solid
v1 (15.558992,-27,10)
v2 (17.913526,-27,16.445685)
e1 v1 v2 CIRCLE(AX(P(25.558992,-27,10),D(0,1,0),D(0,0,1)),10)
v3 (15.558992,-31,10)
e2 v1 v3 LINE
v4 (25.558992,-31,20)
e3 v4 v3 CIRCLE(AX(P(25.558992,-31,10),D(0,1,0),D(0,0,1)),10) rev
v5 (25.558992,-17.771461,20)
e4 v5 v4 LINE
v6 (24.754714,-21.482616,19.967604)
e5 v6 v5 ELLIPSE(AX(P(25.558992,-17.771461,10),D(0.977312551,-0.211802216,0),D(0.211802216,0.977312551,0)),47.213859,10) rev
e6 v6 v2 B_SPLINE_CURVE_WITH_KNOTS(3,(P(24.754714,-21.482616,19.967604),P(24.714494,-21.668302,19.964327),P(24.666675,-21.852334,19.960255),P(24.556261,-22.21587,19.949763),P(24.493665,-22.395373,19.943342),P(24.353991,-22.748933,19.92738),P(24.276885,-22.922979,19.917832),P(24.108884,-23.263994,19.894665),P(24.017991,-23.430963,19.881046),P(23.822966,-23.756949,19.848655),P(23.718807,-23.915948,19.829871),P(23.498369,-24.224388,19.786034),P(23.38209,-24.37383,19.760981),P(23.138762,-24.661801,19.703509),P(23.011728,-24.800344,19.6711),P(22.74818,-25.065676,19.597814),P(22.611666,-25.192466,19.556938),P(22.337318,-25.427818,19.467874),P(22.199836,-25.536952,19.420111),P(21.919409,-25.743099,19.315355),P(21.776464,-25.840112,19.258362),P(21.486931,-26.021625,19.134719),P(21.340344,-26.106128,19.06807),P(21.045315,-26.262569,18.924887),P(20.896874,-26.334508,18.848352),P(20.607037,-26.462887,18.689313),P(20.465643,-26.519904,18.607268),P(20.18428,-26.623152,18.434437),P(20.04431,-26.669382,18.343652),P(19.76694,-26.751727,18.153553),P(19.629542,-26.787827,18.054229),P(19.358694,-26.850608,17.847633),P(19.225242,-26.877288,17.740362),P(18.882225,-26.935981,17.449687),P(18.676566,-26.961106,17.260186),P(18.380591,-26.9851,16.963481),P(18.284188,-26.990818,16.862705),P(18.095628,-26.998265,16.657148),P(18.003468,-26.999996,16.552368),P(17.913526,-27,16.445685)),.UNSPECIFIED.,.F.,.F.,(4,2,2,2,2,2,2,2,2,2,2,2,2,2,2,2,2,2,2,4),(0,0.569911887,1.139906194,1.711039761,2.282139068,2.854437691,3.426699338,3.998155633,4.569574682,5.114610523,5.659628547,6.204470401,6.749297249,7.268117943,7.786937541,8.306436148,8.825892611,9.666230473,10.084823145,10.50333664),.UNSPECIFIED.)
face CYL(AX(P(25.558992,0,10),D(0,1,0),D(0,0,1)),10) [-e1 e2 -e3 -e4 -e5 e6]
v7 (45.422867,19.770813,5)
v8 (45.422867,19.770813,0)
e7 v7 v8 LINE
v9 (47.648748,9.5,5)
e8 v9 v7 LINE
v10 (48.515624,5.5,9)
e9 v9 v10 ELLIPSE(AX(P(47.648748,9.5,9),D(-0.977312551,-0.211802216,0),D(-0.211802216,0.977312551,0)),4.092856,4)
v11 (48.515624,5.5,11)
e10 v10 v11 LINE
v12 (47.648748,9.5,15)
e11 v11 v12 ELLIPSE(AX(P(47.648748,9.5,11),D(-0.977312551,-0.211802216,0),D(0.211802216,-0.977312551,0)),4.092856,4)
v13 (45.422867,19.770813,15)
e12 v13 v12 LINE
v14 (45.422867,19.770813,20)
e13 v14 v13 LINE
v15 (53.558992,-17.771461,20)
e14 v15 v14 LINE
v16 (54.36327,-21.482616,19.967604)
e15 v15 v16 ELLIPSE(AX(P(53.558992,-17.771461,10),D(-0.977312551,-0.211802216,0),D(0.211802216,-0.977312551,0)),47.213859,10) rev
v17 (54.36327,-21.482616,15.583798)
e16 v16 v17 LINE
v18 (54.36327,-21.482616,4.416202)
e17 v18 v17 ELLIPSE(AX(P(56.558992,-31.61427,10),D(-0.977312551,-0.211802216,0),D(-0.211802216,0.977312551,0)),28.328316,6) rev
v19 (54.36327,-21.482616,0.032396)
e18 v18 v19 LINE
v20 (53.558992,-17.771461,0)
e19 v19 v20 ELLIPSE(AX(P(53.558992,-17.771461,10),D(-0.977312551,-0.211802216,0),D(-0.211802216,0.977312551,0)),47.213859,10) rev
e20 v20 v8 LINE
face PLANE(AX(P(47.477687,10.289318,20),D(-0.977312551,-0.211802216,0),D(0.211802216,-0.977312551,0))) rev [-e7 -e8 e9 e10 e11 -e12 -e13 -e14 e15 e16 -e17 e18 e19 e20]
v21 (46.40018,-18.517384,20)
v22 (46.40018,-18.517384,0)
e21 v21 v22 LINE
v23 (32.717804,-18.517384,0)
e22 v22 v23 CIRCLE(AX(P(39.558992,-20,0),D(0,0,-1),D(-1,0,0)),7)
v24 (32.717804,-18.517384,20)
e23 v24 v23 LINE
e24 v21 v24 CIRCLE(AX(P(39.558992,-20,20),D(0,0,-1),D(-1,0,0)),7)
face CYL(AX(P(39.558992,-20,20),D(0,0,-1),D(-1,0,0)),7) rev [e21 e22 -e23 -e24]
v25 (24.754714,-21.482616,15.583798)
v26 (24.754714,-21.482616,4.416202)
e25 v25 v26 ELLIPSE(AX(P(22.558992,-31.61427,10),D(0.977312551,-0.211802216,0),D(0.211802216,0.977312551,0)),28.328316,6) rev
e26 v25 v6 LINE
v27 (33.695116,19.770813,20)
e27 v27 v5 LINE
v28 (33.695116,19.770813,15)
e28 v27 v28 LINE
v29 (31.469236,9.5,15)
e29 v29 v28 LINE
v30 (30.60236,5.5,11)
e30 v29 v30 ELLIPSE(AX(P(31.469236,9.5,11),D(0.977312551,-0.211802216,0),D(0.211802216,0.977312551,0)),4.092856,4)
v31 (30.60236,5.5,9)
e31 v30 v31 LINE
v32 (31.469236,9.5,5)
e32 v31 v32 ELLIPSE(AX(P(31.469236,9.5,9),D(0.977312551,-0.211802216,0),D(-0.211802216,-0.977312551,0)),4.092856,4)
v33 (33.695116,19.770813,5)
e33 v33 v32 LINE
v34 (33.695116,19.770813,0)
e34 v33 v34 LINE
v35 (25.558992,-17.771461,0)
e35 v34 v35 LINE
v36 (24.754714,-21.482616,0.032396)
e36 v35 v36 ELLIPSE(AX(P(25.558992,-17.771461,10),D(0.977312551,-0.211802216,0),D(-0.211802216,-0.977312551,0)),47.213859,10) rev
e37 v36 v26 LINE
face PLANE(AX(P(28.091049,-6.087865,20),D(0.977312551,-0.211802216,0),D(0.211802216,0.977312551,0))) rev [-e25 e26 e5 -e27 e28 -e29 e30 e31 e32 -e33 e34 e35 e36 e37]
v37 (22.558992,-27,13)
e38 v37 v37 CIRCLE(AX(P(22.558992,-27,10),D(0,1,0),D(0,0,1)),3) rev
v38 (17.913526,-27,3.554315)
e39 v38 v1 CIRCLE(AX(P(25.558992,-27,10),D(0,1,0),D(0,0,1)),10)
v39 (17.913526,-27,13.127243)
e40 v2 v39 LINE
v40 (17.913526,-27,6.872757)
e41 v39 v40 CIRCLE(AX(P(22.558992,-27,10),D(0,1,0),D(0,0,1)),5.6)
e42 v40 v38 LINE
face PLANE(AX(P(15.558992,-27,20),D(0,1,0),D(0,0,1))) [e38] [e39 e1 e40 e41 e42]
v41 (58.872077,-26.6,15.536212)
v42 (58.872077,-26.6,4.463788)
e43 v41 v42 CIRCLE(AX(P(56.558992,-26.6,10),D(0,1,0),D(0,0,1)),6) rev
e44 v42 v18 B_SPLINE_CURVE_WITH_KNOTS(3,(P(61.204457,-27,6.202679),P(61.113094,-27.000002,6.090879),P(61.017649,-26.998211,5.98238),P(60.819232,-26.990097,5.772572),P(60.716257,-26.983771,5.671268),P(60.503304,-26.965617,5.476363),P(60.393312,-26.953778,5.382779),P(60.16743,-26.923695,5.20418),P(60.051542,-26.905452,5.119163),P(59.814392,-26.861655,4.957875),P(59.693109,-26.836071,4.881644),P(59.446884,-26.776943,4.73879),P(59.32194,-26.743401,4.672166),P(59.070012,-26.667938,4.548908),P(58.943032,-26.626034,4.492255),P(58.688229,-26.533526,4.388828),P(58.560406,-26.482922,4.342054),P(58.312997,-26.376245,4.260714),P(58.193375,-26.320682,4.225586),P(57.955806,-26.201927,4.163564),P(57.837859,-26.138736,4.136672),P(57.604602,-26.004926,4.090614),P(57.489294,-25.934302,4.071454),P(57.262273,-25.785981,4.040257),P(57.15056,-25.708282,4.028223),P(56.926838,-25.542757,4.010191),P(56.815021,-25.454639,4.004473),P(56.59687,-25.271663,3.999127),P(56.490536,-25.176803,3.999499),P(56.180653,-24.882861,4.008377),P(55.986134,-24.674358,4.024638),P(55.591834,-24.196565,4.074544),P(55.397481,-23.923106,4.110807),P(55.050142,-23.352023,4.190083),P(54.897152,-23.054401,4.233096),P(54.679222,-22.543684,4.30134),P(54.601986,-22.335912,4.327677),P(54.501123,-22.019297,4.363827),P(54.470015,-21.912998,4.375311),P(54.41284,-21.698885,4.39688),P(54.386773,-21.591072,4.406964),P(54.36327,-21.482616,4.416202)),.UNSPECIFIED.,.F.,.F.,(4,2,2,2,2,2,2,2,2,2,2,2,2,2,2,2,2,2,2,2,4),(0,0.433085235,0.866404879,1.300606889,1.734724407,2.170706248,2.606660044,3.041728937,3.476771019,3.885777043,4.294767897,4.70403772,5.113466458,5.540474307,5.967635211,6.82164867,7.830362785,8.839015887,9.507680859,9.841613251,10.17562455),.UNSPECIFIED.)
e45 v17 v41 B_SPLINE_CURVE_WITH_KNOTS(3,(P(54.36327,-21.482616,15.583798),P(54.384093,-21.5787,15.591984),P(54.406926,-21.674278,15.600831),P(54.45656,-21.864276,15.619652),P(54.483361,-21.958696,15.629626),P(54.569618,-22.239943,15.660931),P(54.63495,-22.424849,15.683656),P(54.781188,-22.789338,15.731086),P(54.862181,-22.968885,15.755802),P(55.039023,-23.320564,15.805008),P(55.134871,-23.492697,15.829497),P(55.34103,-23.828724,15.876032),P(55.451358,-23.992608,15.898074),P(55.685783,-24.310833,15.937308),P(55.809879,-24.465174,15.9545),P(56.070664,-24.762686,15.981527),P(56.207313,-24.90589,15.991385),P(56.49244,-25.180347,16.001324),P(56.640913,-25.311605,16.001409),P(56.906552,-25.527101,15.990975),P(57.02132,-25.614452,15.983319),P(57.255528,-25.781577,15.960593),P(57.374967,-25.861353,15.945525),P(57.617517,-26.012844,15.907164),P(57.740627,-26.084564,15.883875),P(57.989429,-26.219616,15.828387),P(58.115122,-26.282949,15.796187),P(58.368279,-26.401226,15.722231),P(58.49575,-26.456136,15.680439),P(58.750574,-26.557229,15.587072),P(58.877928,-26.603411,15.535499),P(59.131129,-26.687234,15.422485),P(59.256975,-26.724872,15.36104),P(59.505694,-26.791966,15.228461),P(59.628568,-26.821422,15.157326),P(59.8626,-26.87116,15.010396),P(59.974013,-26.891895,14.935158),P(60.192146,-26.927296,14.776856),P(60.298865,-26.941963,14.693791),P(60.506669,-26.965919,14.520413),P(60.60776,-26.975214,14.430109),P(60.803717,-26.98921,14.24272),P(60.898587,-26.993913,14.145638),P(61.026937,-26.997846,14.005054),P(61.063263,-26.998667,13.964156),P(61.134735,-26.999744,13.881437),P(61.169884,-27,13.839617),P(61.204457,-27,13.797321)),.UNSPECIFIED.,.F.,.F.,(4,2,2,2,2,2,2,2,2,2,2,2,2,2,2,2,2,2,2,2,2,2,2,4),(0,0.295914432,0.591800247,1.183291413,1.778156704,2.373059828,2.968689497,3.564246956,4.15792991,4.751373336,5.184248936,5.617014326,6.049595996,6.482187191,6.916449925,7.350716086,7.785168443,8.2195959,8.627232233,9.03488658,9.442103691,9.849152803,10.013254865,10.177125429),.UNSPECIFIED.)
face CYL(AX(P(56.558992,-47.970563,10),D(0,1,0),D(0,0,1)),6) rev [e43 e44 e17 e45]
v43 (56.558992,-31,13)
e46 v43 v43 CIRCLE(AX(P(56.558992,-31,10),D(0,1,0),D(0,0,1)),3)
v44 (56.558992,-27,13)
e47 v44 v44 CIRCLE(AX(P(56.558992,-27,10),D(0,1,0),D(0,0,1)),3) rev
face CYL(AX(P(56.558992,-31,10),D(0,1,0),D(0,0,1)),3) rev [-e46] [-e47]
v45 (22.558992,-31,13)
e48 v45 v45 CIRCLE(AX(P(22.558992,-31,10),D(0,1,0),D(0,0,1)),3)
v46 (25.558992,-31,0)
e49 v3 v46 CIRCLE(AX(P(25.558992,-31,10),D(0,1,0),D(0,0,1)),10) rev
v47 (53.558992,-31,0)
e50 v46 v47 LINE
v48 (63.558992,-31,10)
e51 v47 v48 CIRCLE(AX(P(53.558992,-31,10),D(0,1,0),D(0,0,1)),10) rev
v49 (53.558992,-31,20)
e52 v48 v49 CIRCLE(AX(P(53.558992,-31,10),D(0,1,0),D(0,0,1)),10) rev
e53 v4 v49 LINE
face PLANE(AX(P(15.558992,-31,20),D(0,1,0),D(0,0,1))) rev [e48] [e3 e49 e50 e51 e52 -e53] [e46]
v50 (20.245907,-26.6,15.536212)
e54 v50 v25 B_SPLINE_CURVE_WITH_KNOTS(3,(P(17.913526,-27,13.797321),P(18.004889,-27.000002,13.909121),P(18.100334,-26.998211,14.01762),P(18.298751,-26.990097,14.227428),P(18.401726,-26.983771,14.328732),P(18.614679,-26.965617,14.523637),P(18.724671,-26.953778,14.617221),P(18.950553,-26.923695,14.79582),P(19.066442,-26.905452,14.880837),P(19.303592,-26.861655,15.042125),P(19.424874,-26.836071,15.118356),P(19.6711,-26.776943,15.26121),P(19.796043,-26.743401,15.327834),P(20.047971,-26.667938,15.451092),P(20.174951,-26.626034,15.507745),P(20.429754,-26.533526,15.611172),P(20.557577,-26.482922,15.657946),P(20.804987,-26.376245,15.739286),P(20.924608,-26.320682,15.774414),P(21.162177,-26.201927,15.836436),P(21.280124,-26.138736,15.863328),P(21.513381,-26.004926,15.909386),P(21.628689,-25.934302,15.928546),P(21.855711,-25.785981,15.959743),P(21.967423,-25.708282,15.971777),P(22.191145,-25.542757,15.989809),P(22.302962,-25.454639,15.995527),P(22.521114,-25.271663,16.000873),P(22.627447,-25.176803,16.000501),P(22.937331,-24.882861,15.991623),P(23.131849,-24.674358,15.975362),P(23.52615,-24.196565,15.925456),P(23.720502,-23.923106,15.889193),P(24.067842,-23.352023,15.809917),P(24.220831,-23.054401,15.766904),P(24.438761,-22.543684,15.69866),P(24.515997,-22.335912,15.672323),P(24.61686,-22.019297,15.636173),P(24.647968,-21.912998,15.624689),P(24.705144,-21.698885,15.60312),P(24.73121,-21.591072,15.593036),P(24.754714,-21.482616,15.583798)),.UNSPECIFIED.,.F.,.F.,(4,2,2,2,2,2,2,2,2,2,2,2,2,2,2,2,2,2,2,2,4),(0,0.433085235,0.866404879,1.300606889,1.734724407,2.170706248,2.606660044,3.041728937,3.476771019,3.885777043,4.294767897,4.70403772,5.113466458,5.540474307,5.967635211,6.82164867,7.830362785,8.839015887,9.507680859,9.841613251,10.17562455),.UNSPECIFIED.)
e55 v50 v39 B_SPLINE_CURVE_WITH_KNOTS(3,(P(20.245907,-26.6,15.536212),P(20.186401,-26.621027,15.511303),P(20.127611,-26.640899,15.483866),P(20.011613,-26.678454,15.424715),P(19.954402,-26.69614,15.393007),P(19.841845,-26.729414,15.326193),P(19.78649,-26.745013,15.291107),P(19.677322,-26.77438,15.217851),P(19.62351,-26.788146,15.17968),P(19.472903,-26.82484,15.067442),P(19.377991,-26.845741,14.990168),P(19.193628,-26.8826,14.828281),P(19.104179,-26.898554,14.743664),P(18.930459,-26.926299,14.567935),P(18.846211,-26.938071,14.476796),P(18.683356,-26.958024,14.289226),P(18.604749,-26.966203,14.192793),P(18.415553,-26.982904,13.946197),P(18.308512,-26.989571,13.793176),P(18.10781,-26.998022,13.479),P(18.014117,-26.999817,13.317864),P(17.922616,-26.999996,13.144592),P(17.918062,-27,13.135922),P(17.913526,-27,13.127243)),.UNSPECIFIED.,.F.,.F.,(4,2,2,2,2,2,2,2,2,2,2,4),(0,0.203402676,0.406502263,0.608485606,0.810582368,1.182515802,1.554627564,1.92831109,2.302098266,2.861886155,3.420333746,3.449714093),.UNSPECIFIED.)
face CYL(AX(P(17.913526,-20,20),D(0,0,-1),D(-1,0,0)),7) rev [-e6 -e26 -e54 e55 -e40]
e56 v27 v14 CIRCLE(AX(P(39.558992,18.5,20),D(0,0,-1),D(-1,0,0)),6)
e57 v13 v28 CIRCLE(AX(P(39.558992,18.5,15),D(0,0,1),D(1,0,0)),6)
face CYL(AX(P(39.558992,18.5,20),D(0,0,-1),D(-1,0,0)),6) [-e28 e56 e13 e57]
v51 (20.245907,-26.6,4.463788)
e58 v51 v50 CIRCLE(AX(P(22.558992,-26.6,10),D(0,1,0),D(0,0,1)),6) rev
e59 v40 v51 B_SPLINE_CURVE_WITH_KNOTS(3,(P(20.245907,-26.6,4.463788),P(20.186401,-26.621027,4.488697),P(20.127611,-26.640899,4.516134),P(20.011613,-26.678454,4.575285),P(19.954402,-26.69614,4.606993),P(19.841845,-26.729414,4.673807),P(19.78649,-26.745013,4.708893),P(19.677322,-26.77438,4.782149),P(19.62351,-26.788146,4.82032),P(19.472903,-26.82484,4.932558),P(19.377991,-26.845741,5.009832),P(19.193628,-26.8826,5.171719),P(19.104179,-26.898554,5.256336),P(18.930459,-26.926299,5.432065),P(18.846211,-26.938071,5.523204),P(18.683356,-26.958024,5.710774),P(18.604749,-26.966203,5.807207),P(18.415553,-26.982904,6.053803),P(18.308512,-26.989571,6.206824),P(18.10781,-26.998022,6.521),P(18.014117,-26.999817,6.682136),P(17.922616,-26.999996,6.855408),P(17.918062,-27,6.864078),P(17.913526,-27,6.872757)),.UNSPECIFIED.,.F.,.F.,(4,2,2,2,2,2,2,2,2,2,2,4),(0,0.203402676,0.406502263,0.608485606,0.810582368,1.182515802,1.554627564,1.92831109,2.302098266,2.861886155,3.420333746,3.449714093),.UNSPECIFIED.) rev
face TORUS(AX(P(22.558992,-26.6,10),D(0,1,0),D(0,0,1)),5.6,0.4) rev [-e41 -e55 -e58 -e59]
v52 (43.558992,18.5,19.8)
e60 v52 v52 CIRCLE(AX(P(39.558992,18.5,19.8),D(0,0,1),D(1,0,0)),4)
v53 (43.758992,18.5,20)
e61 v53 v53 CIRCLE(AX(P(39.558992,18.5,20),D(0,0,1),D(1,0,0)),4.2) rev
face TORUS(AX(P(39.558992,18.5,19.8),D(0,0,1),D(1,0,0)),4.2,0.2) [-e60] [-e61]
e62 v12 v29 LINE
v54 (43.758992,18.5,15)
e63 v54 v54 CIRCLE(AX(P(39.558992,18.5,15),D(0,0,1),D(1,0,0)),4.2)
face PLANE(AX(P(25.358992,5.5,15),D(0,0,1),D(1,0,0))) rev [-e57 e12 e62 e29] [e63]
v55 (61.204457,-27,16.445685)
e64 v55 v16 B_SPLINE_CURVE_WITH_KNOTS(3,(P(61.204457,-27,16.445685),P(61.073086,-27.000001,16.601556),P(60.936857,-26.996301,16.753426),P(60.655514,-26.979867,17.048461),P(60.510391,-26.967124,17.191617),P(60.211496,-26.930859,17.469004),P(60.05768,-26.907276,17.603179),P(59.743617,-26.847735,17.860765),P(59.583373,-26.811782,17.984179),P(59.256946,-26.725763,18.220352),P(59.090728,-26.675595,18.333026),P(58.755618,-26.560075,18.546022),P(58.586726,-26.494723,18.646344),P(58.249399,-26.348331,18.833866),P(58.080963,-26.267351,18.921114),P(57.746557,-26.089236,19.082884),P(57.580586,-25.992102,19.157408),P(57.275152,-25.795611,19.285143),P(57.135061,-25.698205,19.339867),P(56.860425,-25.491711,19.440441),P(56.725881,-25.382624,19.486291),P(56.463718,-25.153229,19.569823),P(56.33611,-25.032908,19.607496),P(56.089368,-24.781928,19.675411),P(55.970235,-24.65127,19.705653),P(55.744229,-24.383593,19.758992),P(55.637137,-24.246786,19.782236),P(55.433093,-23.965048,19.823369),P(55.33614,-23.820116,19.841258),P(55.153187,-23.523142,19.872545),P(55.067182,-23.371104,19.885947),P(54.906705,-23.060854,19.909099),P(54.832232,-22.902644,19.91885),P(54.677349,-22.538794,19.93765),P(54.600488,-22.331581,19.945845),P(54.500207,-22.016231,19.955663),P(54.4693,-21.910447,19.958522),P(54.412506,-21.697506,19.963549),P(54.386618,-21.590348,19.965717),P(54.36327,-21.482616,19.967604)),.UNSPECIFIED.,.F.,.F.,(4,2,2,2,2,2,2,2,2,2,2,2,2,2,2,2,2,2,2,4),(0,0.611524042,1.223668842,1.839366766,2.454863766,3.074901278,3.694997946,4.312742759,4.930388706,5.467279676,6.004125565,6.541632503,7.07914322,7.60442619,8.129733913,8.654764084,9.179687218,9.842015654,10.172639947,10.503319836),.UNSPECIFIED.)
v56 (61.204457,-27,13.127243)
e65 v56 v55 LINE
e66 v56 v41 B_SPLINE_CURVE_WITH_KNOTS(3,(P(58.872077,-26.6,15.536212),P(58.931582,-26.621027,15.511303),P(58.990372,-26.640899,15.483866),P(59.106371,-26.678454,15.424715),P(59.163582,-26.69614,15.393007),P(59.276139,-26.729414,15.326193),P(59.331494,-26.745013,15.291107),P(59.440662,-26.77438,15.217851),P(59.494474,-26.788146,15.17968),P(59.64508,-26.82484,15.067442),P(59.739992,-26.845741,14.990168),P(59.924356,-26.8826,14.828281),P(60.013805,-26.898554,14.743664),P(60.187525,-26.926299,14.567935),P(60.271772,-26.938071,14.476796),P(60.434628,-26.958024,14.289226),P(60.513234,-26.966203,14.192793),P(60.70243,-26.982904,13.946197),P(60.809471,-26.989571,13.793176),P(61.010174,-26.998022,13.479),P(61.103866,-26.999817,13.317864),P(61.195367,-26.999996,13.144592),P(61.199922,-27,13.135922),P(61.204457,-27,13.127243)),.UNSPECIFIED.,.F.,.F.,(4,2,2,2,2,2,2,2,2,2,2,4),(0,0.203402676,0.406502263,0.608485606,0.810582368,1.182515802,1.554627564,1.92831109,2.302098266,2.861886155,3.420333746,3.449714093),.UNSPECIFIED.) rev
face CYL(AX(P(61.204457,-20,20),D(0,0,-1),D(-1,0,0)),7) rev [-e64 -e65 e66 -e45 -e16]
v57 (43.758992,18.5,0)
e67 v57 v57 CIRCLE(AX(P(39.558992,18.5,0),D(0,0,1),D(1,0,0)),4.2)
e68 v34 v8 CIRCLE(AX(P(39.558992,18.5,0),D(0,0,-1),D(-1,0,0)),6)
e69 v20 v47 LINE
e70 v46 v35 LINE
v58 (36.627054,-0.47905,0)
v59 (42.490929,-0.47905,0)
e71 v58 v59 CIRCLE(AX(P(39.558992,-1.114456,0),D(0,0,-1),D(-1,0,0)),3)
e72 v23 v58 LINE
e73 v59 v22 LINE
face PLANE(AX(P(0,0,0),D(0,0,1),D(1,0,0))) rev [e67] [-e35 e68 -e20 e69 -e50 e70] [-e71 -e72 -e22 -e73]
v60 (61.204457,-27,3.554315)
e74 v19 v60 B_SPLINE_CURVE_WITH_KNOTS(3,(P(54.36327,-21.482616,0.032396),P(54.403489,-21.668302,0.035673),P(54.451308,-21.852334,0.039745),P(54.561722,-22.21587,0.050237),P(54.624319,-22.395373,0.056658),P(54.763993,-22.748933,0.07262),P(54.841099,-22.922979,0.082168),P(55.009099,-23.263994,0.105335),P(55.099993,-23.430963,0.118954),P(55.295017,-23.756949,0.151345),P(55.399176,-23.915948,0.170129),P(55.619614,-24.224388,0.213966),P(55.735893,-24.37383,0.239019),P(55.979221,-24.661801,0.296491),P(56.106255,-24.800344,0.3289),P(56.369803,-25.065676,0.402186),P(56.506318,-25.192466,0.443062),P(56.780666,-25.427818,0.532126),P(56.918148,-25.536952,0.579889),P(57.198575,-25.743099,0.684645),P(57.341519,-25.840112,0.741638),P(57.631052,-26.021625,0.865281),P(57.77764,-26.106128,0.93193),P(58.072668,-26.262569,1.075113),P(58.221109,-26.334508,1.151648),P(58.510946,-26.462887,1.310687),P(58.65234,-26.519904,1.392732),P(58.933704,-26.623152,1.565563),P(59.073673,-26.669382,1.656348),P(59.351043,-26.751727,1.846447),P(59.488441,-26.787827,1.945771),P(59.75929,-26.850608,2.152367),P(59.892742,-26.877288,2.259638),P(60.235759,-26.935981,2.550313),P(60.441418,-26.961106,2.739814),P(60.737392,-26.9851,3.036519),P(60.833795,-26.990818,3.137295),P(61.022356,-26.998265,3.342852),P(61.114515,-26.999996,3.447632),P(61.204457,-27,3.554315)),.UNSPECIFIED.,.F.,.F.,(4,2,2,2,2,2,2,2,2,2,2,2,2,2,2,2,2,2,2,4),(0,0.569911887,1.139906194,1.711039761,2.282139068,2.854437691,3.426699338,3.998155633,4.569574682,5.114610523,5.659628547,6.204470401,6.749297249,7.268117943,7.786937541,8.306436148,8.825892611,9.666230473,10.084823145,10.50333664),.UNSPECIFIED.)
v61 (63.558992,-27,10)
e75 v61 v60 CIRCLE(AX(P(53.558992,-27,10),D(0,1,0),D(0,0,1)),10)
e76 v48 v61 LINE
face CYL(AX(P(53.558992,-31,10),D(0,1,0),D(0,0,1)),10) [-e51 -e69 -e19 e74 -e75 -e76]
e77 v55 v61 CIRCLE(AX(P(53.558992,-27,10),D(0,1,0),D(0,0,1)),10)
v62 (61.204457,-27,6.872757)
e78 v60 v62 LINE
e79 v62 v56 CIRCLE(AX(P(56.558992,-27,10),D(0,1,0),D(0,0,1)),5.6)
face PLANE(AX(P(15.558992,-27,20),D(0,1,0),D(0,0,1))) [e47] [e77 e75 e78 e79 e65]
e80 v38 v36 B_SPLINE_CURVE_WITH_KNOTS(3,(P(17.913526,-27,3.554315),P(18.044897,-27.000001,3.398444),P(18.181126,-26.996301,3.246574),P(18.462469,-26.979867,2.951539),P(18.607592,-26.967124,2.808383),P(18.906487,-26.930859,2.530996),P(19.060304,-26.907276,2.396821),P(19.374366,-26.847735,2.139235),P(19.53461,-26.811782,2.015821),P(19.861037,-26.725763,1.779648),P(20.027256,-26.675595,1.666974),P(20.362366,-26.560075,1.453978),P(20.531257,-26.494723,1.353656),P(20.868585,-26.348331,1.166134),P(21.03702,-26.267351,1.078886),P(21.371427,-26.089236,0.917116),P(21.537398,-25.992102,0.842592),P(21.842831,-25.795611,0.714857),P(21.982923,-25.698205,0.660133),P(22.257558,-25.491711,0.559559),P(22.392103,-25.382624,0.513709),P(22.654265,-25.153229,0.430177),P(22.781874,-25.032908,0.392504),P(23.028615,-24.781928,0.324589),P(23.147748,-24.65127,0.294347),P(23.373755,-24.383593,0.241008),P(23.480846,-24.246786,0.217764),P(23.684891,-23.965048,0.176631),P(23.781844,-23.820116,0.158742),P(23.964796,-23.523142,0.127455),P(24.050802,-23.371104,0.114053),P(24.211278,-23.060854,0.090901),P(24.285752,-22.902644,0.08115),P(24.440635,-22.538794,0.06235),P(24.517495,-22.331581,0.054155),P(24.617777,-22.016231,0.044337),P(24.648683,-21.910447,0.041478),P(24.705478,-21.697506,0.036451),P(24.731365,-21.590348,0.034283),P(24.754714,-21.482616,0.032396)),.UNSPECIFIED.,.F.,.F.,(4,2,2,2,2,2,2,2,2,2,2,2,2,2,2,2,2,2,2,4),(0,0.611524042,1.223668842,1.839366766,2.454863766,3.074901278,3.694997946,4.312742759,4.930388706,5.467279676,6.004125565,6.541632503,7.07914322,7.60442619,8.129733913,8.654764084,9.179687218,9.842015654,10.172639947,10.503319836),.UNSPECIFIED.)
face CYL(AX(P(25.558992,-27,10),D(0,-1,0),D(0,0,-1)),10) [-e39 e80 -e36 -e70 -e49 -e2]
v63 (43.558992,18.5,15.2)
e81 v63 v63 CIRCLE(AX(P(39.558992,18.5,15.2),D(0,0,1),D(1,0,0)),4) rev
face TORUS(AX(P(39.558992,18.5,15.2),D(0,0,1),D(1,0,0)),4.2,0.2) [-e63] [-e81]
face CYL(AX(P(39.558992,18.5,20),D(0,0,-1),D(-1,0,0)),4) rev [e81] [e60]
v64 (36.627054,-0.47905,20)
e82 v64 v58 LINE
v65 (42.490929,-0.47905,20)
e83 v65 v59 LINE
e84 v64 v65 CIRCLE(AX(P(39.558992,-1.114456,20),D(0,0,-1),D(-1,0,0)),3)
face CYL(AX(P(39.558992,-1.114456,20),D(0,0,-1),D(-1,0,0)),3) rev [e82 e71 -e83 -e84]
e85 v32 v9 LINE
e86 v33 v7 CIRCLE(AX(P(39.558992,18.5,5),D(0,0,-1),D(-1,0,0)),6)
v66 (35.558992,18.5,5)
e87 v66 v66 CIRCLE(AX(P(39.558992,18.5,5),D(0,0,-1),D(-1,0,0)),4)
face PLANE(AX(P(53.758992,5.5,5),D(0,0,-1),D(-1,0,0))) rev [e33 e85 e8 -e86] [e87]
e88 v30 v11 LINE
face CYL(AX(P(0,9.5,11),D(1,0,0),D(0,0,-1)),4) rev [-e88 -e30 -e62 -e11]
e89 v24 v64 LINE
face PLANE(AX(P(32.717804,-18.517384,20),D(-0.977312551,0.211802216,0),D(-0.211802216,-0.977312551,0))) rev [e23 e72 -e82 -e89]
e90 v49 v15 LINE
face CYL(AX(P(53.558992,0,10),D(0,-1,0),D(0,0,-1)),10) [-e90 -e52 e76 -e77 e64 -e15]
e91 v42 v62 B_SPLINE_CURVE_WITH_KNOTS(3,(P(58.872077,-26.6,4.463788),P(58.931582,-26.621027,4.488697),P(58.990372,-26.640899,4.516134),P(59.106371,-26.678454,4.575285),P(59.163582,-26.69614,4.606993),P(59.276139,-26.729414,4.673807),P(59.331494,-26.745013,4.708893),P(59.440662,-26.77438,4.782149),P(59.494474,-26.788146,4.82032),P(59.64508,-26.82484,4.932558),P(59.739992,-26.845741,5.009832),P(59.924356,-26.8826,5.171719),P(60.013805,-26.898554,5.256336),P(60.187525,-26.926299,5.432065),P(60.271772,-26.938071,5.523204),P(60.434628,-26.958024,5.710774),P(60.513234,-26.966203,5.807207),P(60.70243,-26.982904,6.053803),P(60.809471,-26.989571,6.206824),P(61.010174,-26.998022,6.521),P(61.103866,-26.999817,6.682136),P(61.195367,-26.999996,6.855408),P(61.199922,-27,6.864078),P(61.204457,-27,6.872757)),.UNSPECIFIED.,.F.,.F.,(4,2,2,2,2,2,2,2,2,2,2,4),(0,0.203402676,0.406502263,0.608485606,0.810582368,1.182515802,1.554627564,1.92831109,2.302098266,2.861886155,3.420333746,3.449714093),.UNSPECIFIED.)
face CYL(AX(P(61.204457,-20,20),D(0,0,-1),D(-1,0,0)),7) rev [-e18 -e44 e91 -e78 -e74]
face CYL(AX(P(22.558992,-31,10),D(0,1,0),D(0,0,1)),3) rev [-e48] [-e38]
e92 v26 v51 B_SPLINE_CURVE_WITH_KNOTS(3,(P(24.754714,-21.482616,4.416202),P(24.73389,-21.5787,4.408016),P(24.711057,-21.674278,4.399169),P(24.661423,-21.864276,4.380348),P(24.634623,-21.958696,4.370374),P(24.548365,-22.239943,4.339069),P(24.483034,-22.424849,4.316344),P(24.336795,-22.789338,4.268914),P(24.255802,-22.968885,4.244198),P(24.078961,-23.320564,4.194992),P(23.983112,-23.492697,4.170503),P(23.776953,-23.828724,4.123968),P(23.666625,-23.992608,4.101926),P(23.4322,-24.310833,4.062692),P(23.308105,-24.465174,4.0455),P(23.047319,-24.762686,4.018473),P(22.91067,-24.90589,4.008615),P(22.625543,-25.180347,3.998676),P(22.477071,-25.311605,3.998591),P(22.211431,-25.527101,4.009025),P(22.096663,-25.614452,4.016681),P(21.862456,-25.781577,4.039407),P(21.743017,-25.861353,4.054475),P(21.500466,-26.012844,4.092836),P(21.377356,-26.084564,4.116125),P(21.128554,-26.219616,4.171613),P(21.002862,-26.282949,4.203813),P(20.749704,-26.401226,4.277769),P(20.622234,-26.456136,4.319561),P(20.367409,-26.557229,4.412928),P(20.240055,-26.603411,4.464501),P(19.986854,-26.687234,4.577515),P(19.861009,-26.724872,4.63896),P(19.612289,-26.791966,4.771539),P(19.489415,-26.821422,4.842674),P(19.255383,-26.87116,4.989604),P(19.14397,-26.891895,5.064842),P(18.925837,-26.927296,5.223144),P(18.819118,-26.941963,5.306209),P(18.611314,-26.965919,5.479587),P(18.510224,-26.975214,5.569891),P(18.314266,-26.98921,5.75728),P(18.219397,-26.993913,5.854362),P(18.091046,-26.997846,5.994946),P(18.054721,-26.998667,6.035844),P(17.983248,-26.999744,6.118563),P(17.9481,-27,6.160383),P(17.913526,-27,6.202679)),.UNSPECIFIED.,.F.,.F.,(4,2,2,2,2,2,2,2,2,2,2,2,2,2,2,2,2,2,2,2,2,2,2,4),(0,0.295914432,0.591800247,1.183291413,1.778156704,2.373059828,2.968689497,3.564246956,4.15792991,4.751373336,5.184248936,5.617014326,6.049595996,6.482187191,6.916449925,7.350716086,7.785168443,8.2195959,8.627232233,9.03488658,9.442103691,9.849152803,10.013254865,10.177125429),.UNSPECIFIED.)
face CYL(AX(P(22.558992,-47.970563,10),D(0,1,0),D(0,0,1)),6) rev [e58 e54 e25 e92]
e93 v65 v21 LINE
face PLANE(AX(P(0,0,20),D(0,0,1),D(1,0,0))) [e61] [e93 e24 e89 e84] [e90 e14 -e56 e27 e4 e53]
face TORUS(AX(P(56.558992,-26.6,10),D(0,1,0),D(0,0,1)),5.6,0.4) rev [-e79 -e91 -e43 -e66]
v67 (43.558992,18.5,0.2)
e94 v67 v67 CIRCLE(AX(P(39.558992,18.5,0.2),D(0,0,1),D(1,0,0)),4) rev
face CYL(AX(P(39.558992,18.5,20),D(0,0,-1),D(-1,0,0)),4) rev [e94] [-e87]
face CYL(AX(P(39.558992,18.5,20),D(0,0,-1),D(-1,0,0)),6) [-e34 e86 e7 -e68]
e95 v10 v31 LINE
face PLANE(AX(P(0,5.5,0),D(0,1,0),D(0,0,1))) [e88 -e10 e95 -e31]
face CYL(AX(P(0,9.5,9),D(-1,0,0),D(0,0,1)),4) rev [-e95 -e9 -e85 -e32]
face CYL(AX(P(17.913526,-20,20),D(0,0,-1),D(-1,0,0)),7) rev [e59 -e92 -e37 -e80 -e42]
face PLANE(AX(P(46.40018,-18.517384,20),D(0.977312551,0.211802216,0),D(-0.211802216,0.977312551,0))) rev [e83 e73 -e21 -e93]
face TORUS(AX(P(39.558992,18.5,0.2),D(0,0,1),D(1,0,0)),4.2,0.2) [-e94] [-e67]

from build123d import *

# Parameters (mm, degrees)
SZKIC1_R                    = 4
DODANIE_WYCI_GNI_CIE1_DEPTH = 20
SZKIC2_W                    = 28.4
SZKIC2_H                    = 10
WYTNIJ_WYCI_GNI_CIE1_DEPTH  = 22
SZKIC3_R                    = 3
WYTNIJ_WYCI_GNI_CIE2_DEPTH  = 89.667893976
SZKIC4_R                    = 6
WYTNIJ_WYCI_GNI_CIE3_DEPTH  = 54.5
WYTNIJ_WYCI_GNI_CIE5_DEPTH  = 74.489764063
ZAOKR_GLENIE1_R             = 10
WYTNIJ_WYCI_GNI_CIE6_DEPTH  = 74.489764063
ZAOKR_GLENIE2_R             = 7
ZAOKR_GLENIE3_R             = 4
ZAOKR_GLENIE4_R             = 0.4
ZAOKR_GLENIE5_R             = 0.2


with BuildPart() as part:
    # Szkic1 → Dodanie-wyciągnięcie1 (new body)
    with BuildSketch(Plane.XY):
        Polygon((15.55899167, -31), (63.55899167, -31), (63.55899167, -27), (48.75899167, 4.5), (48.75899167, 27.5), (30.35899167, 27.5), (30.35899167, 4.5), (15.55899167, -27), align=None)
        with Locations((39.55899167, 18.5)):
            Circle(SZKIC1_R, mode=Mode.SUBTRACT)
    extrude(amount=DODANIE_WYCI_GNI_CIE1_DEPTH)

    # Szkic2 → Wytnij-wyciągnięcie1 (cut)
    with BuildSketch(Plane(origin=(0, 27.5, 0), x_dir=(1, 0, 0), z_dir=(0, 1, 0))):
        with Locations((39.55899167, -10)):
            Rectangle(SZKIC2_W, SZKIC2_H)
    extrude(amount=-WYTNIJ_WYCI_GNI_CIE1_DEPTH, mode=Mode.SUBTRACT)

    # Szkic3 → Wytnij-wyciągnięcie2 (cut, through all)
    with BuildSketch(Plane(origin=(0, 27.5, 0), x_dir=(1, 0, 0), z_dir=(0, 1, 0))):
        with Locations(Location((56.55899167, -10, 0), (0, 0, 270))):
            Circle(SZKIC3_R)
        with Locations(Location((22.55899167, -10, 0), (0, 0, 270))):
            Circle(SZKIC3_R)
    extrude(amount=-WYTNIJ_WYCI_GNI_CIE2_DEPTH, mode=Mode.SUBTRACT)

    # Szkic4 → Wytnij-wyciągnięcie3 (cut)
    with BuildSketch(Plane(origin=(0, 27.5, 0), x_dir=(1, 0, 0), z_dir=(0, 1, 0))):
        with Locations(Location((56.55899167, -10, 0), (0, 0, 270))):
            Circle(SZKIC4_R)
        with Locations(Location((22.55899167, -10, 0), (0, 0, 270))):
            Circle(SZKIC4_R)
    extrude(amount=-WYTNIJ_WYCI_GNI_CIE3_DEPTH, mode=Mode.SUBTRACT)

    # Szkic6 → Wytnij-wyciągnięcie5 (cut, through all)
    with BuildSketch(Plane(origin=(0, 0, 0), x_dir=(-1, 0, 0), z_dir=(0, 0, -1))):
        with BuildLine():
            Line((-63.55899167, -27), (-55.55899167, -27))
            Line((-55.55899167, -27), (-45.422866973, 19.770813293))
            ThreePointArc((-45.422866973, 19.770813293), (-39.55899167, 24.5), (-33.695116367, 19.770813293))
            Line((-33.695116367, 19.770813293), (-23.55899167, -27))
            Line((-23.55899167, -27), (-15.55899167, -27))
            Line((-15.55899167, -27), (-15.55899167, 33))
            Line((-15.55899167, 33), (-63.55899167, 33))
            Line((-63.55899167, 33), (-63.55899167, -27))
        make_face()
    extrude(amount=-WYTNIJ_WYCI_GNI_CIE5_DEPTH, mode=Mode.SUBTRACT)

    # Zaokrąglenie1
    # the kernel refuses this fillet: 10 mm, written as the material it takes off along each edge
    with BuildSketch(Plane(origin=(63.55899167, -56, 20), x_dir=(0, 0, -1), z_dir=(0, 1, 0)), Plane(origin=(15.55899167, -2, 0), x_dir=(1, 0, 0), z_dir=(0, -1, 0))) as zaokr_glenie1_piece_1:
        with BuildLine():
            CenterArc((ZAOKR_GLENIE1_R, ZAOKR_GLENIE1_R), ZAOKR_GLENIE1_R, 180, 90)
            Line((0, ZAOKR_GLENIE1_R), (0, 0))
            Line((0, 0), (ZAOKR_GLENIE1_R, 0))
        make_face()
    extrude(amount=54, mode=Mode.SUBTRACT)
    with BuildSketch(Plane(origin=(63.55899167, -56, 0), x_dir=(0, 0, 1), z_dir=(0, 1, 0)), Plane(origin=(15.55899167, -2, 20), x_dir=(1, 0, 0), z_dir=(0, -1, 0))) as zaokr_glenie1_piece_2:
        with BuildLine():
            CenterArc((ZAOKR_GLENIE1_R, -ZAOKR_GLENIE1_R), ZAOKR_GLENIE1_R, 90, 90)
            Line((0, -ZAOKR_GLENIE1_R), (0, 0))
            Line((0, 0), (ZAOKR_GLENIE1_R, 0))
        make_face()
    extrude(amount=54, mode=Mode.SUBTRACT)

    # Szkic7 → Wytnij-wyciągnięcie6 (cut, through all)
    with BuildSketch(Plane(origin=(0, 0, 0), x_dir=(-1, 0, 0), z_dir=(0, 0, -1))):
        with BuildLine():
            Line((-46.400179524, -18.517384491), (-42.490929322, -0.479049644))
            ThreePointArc((-42.490929322, -0.479049644), (-39.55899167, 1.885543709), (-36.627054018, -0.479049644))
            Line((-36.627054018, -0.479049644), (-32.717803816, -18.517384491))
            ThreePointArc((-32.717803816, -18.517384491), (-39.55899167, -27), (-46.400179524, -18.517384491))
        make_face()
    extrude(amount=-WYTNIJ_WYCI_GNI_CIE6_DEPTH, mode=Mode.SUBTRACT)

    # Zaokrąglenie2
    zaokr_glenie2_edges = [part.edges().sort_by_distance(p)[0] for p in [
        (55.55899167, -27, 17.857019377),
        (55.55899167, -27, 2.142980623),
        (23.55899167, -27, 17.857019377),
        (23.55899167, -27, 2.142980623),
    ]]
    fillet(zaokr_glenie2_edges, radius=ZAOKR_GLENIE2_R)

    # Zaokrąglenie3
    zaokr_glenie3_edges = [part.edges().sort_by_distance(p)[0] for p in [
        (39.55899167, 5.5, 5),
        (39.55899167, 5.5, 15),
    ]]
    fillet(zaokr_glenie3_edges, radius=ZAOKR_GLENIE3_R)

    # Zaokrąglenie4
    zaokr_glenie4_edges = [part.edges().sort_by_distance(p)[0] for p in [
        (50.55899167, -27, 10),
        (28.55899167, -27, 10),
    ]]
    fillet(zaokr_glenie4_edges, radius=ZAOKR_GLENIE4_R)

    # Zaokrąglenie5
    zaokr_glenie5_edges = [part.edges().sort_by_distance(p)[0] for p in [
        (35.55899167, 18.5, 0),
        (35.55899167, 18.5, 20),
        (35.55899167, 18.5, 15),
    ]]
    fillet(zaokr_glenie5_edges, radius=ZAOKR_GLENIE5_R)


solid = part.part
